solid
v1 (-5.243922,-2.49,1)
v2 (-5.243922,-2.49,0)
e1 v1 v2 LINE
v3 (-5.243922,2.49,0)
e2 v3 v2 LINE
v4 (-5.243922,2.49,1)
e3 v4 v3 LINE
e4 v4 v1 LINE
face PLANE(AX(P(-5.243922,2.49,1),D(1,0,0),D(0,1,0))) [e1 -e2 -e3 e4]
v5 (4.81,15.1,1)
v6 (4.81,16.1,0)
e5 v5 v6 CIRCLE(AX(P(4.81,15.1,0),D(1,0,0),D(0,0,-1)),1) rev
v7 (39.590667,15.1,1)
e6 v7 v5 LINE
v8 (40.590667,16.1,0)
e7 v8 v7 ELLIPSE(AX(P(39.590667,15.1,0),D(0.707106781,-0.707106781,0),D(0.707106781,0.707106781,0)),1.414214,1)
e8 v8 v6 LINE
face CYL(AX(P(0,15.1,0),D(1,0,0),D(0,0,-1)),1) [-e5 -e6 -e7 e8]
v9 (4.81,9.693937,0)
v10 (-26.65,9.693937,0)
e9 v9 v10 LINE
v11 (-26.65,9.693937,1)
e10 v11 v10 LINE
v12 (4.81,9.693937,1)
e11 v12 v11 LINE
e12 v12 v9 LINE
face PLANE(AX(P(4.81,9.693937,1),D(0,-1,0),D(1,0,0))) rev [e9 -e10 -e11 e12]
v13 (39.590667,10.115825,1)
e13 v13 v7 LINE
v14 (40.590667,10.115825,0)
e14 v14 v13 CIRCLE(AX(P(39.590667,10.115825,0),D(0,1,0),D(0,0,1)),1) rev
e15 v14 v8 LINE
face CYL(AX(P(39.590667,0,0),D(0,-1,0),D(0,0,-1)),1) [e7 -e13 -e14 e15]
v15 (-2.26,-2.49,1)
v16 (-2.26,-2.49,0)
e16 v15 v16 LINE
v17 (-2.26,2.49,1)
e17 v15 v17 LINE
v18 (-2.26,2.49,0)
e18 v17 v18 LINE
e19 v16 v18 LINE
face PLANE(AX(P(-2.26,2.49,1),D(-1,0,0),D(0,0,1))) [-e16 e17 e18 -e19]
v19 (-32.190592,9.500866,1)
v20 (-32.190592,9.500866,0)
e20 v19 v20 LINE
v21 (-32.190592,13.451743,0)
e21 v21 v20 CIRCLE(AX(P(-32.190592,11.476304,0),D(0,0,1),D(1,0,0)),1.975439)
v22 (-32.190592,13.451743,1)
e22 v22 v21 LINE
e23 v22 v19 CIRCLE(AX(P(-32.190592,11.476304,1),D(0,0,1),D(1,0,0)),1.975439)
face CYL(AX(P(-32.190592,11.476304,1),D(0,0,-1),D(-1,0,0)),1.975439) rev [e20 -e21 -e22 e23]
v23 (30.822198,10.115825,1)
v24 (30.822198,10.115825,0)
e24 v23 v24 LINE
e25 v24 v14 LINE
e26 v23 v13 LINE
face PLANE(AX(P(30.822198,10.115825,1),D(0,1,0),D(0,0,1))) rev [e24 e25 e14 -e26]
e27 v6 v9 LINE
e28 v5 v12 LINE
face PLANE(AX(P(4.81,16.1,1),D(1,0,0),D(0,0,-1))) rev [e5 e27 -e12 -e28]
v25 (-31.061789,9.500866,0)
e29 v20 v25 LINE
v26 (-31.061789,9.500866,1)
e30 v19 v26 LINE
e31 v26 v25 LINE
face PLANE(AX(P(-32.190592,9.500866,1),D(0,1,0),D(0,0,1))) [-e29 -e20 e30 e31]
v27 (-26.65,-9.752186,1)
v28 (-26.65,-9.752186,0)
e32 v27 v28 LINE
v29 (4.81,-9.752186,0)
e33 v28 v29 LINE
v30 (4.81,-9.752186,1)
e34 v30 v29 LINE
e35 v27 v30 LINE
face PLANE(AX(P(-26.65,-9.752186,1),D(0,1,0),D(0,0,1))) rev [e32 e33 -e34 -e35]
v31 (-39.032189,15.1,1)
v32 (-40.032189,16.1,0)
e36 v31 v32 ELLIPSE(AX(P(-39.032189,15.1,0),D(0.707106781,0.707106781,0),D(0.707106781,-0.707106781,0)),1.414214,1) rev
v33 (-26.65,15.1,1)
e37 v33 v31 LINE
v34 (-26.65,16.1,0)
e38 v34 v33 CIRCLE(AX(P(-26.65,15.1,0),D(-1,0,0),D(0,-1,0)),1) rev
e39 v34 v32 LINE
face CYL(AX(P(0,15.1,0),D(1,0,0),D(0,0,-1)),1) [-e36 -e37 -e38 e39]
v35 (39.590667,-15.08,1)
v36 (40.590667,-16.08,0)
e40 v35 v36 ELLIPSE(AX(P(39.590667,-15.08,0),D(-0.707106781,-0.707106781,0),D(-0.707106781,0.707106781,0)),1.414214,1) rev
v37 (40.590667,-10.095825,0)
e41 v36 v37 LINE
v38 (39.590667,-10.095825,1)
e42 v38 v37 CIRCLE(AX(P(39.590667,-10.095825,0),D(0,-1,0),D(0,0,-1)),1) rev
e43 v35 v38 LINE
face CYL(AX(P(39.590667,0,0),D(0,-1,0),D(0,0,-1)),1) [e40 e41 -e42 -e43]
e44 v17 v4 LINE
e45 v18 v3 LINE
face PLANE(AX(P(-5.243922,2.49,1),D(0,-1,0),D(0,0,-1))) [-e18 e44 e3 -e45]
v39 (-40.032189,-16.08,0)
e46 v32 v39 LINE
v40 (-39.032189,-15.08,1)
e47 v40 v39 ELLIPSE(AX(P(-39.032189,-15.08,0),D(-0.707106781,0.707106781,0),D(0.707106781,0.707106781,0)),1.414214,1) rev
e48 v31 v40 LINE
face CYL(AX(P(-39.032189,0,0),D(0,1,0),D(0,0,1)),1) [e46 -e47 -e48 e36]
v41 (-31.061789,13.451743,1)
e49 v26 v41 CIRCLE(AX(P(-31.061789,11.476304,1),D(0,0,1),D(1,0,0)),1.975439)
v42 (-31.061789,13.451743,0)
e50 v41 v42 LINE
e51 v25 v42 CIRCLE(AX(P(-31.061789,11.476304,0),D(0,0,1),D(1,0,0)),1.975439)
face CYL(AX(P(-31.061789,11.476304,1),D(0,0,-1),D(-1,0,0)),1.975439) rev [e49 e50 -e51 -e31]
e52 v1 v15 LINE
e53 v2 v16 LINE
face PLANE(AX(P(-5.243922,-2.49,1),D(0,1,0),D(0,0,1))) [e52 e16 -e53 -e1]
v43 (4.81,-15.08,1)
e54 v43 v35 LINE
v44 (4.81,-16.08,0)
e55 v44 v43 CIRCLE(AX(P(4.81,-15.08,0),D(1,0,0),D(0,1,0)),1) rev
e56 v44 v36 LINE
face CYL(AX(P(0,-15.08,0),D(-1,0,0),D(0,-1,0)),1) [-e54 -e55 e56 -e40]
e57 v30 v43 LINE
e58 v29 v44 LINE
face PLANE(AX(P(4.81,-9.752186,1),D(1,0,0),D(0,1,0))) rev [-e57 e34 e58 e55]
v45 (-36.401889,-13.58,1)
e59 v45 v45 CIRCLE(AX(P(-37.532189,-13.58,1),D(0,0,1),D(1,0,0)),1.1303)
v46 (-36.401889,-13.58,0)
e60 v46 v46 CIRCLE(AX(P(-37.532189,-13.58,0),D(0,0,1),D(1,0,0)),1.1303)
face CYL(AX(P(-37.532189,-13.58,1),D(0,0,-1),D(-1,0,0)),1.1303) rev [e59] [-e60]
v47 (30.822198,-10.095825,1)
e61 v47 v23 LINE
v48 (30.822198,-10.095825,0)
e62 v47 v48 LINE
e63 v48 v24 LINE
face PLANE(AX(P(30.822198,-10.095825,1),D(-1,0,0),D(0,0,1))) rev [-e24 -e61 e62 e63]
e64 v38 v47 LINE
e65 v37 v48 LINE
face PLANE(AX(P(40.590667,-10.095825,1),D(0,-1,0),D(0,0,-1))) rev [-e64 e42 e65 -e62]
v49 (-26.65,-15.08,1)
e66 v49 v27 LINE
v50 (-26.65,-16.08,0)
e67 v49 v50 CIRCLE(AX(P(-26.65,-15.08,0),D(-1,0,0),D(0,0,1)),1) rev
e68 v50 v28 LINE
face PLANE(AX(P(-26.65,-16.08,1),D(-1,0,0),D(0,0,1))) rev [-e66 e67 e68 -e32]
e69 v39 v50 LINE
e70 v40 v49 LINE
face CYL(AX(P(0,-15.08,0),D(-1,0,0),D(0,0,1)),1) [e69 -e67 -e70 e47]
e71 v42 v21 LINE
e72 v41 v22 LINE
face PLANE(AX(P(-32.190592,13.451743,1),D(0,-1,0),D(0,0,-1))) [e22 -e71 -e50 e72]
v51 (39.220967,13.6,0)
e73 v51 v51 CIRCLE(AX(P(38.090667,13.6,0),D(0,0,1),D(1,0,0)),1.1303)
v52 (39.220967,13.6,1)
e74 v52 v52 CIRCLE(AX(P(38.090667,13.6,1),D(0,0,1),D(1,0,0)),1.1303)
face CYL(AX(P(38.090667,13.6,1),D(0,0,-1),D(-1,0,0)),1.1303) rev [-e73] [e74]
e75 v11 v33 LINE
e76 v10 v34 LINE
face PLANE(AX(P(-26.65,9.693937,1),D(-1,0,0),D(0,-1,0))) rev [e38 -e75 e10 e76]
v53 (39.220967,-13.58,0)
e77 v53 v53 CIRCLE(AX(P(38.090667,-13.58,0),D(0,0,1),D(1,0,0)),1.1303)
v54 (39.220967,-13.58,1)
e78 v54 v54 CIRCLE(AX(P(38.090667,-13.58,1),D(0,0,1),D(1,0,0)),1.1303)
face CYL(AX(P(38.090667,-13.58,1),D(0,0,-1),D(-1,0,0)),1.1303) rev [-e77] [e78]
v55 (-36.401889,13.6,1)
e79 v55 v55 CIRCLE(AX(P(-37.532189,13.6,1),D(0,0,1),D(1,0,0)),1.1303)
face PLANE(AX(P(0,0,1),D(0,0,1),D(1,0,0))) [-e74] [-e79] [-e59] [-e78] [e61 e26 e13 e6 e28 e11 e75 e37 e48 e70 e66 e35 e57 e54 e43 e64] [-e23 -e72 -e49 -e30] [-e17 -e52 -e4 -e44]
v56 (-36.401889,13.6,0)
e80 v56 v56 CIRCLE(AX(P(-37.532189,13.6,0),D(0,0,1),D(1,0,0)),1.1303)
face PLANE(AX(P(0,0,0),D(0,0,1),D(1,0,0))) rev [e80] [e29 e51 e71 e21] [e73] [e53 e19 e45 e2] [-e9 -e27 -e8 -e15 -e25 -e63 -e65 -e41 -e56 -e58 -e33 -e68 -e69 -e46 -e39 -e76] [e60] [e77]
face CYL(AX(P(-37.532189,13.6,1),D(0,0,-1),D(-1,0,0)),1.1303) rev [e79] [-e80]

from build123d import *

# Parameters (mm, degrees)
SKETCH1_R           = 1.1303
SKETCH1_W           = 2.983921929
SKETCH1_H           = 4.98
BOSS_EXTRUDE1_DEPTH = 1
FILLET1_R           = 1


with BuildPart() as part:
    # Sketch1 → Boss-Extrude1 (new body)
    with BuildSketch(Plane.XY):
        Polygon((-26.65, 16.1), (-40.032188793, 16.1), (-40.032188793, -16.08), (-26.65, -16.08), (-26.65, -9.752186355), (4.81, -9.752186355), (4.81, -16.08), (40.590666929, -16.08), (40.590666929, -10.095824831), (30.822198497, -10.095824831), (30.822198497, 10.115824831), (40.590666929, 10.115824831), (40.590666929, 16.1), (4.81, 16.1), (4.81, 9.693936617), (-26.65, 9.693936617), align=None)
        with Locations((-37.532188793, 13.6)):
            Circle(SKETCH1_R, mode=Mode.SUBTRACT)
        with Locations((-37.532188793, -13.58)):
            Circle(SKETCH1_R, mode=Mode.SUBTRACT)
        with Locations((38.090666929, 13.6)):
            Circle(SKETCH1_R, mode=Mode.SUBTRACT)
        with Locations((38.090666929, -13.58)):
            Circle(SKETCH1_R, mode=Mode.SUBTRACT)
        with Locations((-3.751960965, 0)):
            Rectangle(SKETCH1_W, SKETCH1_H, mode=Mode.SUBTRACT)
        with BuildLine():
            Line((-32.190591627, 13.451742973), (-31.061789136, 13.451742973))
            ThreePointArc((-31.061789136, 13.451742973), (-29.086350608, 11.476304445), (-31.061789136, 9.500865917))
            Line((-31.061789136, 9.500865917), (-32.190591627, 9.500865917))
            ThreePointArc((-32.190591627, 9.500865917), (-34.166030155, 11.476304445), (-32.190591627, 13.451742973))
        make_face(mode=Mode.SUBTRACT)
    extrude(amount=BOSS_EXTRUDE1_DEPTH)

    # Fillet1
    fillet1_edges = [part.edges().sort_by_distance(p)[0] for p in [
        (40.590666929, 13.107912416, 1),
        (22.700333464, 16.1, 1),
        (40.590666929, -13.087912416, 1),
        (22.700333464, -16.08, 1),
        (-33.341094396, -16.08, 1),
        (-40.032188793, 0.01, 1),
        (-33.341094396, 16.1, 1),
    ]]
    fillet(fillet1_edges, radius=FILLET1_R - 0.0001)  # a hair under: the kernel refuses the full size


solid = part.part
